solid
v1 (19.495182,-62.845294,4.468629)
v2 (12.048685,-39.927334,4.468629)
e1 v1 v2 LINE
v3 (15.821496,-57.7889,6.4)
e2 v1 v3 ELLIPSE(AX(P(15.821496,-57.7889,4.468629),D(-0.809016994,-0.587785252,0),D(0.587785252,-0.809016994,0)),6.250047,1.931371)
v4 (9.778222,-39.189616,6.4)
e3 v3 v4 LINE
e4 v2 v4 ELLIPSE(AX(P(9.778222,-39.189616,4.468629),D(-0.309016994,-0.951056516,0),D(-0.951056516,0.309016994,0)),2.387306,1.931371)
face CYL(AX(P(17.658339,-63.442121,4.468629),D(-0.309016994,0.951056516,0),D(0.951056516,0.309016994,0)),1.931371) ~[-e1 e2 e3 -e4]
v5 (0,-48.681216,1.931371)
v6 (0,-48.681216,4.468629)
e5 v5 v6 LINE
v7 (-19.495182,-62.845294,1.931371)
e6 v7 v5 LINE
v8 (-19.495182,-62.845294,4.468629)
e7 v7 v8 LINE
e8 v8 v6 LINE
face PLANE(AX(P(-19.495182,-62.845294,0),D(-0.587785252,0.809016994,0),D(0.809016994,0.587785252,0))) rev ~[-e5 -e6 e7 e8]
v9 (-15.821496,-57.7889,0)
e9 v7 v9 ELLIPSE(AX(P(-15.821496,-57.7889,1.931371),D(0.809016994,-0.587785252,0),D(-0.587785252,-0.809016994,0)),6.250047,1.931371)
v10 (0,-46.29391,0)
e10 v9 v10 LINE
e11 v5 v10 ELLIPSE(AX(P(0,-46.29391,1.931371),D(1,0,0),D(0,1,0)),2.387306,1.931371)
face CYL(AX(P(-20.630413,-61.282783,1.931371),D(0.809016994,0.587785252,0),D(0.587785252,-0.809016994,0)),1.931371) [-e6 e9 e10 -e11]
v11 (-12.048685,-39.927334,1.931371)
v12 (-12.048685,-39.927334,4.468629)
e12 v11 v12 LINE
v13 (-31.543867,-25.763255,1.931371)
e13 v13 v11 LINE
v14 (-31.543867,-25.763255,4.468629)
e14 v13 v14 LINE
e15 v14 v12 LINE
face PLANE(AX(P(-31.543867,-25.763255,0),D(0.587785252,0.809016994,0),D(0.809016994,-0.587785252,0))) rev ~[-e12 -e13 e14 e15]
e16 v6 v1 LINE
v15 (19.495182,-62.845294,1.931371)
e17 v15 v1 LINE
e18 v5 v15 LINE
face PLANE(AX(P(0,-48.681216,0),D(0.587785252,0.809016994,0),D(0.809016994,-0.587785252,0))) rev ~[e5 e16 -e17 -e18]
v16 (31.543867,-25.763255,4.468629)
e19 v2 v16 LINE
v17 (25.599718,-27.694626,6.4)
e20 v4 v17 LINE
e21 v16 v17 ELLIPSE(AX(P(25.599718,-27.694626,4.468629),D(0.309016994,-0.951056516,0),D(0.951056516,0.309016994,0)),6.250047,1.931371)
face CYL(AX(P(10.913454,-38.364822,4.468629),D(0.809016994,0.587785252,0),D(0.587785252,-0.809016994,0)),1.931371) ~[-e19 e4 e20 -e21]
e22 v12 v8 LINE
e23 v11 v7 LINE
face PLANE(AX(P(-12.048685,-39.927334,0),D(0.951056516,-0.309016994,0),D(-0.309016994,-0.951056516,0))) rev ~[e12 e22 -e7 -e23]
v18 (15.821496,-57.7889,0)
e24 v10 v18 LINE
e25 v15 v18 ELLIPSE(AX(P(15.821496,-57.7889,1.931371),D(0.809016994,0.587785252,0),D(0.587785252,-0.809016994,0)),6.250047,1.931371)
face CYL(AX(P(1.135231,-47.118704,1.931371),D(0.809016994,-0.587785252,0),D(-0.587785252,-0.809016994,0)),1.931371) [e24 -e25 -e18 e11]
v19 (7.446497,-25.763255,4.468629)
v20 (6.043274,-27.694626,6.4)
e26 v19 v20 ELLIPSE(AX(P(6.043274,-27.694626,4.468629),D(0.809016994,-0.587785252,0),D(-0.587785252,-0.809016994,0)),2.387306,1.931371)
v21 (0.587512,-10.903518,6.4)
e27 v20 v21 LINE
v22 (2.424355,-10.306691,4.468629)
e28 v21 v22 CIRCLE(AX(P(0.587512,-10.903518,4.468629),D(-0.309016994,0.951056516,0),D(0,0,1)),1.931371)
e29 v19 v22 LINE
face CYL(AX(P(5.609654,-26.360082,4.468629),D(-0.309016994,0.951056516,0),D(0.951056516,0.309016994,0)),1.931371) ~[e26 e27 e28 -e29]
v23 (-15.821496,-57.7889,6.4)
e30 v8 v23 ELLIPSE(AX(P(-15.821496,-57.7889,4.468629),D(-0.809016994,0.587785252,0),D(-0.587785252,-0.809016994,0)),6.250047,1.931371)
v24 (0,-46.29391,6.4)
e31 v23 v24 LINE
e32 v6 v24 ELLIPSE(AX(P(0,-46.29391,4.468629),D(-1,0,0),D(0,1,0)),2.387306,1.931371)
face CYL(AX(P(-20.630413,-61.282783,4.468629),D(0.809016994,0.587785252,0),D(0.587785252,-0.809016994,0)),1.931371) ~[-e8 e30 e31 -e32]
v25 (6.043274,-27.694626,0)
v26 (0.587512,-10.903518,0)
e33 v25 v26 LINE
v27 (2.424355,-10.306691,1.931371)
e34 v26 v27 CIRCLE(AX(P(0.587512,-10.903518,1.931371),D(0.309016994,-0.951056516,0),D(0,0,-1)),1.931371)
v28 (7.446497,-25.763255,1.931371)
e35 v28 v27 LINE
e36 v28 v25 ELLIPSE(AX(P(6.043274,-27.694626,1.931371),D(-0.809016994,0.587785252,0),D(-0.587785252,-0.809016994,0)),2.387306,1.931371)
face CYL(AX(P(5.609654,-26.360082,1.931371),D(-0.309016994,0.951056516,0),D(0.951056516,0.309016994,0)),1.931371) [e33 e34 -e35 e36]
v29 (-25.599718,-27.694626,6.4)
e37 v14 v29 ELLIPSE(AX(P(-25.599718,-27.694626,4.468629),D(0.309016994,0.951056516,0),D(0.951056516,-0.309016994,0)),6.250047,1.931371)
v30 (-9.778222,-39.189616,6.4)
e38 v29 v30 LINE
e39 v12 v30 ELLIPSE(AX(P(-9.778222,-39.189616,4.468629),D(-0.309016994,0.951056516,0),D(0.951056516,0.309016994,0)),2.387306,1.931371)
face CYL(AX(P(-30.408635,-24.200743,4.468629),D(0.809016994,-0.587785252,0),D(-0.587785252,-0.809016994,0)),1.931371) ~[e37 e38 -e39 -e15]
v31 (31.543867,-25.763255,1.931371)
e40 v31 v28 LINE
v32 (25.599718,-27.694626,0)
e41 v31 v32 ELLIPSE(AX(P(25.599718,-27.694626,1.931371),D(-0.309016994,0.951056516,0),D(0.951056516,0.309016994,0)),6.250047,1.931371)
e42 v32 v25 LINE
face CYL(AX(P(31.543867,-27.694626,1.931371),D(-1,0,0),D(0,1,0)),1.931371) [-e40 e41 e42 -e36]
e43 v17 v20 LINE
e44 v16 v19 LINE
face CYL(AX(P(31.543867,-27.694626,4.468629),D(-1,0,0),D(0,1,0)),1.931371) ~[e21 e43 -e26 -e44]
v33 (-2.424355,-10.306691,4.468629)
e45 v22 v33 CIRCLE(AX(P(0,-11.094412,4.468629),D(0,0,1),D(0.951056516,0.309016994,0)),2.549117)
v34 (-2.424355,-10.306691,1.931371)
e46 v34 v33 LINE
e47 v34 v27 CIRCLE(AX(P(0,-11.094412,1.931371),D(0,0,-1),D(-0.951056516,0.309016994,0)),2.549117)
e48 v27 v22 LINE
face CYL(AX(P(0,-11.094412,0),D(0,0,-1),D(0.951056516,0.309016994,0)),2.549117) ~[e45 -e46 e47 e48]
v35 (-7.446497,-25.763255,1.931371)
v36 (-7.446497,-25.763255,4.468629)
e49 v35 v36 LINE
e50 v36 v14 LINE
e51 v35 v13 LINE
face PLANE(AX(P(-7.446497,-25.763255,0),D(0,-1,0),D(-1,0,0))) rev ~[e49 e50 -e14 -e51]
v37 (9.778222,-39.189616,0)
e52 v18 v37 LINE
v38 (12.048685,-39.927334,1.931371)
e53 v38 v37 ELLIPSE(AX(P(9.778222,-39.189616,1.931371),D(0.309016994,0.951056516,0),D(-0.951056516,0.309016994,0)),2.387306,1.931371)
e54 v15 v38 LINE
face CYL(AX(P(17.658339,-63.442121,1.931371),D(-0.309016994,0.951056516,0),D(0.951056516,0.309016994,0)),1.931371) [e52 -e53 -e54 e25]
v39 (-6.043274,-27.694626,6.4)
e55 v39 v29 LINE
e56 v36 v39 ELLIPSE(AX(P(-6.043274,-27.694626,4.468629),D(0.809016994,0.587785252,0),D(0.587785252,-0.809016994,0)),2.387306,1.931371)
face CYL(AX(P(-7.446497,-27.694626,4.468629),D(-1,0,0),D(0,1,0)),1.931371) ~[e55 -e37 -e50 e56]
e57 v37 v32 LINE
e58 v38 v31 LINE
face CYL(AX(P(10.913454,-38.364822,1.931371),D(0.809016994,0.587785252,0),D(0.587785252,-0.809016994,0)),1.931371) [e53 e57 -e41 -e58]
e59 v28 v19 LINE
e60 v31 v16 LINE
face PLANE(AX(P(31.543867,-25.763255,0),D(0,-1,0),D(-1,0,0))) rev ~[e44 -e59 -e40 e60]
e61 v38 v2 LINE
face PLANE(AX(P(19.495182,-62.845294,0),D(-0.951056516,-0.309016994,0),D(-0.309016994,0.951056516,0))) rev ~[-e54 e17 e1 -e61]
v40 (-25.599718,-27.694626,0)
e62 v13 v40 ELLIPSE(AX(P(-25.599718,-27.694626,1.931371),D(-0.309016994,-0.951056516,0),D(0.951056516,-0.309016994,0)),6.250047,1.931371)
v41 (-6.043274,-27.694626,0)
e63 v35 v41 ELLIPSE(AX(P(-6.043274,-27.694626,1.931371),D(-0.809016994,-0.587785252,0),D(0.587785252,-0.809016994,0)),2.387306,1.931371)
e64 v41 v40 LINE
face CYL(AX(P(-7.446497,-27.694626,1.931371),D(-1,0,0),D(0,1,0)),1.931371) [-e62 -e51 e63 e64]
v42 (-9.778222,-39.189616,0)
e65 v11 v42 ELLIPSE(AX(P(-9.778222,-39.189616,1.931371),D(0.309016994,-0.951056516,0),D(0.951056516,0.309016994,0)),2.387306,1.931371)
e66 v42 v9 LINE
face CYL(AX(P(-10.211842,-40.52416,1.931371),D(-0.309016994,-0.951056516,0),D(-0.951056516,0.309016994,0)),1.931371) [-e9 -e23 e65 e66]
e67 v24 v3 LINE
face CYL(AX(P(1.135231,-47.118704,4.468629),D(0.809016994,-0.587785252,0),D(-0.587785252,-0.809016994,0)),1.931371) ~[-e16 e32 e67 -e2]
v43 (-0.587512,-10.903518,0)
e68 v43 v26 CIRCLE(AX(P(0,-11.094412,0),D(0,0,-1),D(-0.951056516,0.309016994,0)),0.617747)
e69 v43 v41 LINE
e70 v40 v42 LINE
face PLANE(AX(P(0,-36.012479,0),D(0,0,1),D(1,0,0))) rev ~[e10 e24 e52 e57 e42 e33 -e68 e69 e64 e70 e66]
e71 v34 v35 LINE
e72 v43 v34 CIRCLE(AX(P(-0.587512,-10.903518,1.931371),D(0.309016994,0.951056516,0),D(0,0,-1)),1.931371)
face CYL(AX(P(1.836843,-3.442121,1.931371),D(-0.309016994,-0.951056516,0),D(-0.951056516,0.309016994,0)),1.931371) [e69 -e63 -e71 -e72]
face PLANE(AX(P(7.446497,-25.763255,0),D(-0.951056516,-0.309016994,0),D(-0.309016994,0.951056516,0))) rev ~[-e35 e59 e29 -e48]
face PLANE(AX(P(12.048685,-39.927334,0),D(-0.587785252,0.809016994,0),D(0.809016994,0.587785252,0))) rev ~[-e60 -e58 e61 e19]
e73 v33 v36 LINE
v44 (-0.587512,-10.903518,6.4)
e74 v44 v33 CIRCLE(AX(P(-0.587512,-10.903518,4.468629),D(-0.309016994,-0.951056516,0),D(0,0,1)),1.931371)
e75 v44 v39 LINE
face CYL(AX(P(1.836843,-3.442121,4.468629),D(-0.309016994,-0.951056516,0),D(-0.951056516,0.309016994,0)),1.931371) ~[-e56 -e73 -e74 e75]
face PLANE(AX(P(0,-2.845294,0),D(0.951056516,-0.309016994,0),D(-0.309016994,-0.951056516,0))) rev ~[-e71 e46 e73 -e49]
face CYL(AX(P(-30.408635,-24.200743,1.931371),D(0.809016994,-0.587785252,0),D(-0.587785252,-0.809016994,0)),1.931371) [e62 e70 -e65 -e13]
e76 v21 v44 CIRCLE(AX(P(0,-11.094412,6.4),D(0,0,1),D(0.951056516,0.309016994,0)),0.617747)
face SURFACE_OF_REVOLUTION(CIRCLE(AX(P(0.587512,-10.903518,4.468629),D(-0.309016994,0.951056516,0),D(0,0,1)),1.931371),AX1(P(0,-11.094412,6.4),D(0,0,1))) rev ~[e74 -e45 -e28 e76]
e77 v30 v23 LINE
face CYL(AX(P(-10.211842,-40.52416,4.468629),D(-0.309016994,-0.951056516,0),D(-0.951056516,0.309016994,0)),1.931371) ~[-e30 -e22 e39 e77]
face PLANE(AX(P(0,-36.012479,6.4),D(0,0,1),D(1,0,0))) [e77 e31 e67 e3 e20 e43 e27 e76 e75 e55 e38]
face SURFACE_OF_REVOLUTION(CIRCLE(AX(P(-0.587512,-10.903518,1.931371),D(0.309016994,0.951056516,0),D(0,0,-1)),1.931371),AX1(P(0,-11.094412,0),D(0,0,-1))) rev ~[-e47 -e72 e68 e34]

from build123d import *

# Parameters (mm, degrees)
F1_DEPTH    = 6.4
F5_R        = 1.9313708499
F6_T1_DEPTH = 6.4
F6_T4_ANGLE = 144
F6_T6_ANGLE = 144


# Not quite as in the source:
# - a fillet or chamfer that OpenCascade refuses, or shapes differently, is made with other operations: its cross-section is extruded or revolved along the edge and cut away or added


with BuildPart() as f1:
    # F0 (on Top) → F1 (new body)
    with BuildSketch(Plane.XY):
        Polygon((-31.5438667271, -25.7632551613), (-12.0486849532, -39.9273338113), (-19.495181774, -62.8452944863), (0, -48.6812158363), (19.495181774, -62.8452944863), (12.0486849532, -39.9273338113), (31.5438667271, -25.7632551613), (7.4464968208, -25.7632551613), (0, -2.8452944863), (-7.4464968208, -25.7632551613), align=None)
    extrude(amount=F1_DEPTH)

    # F5
    f5_edges = [f1.edges().sort_by_distance(p)[0] for p in [
        (-21.796276, -32.845294, 6.4),
        (-15.771933, -51.386314, 6.4),
        (-9.747591, -55.763255, 6.4),
        (9.747591, -55.763255, 6.4),
        (15.771933, -51.386314, 6.4),
        (21.796276, -32.845294, 6.4),
        (19.495182, -25.763255, 6.4),
        (3.723248, -14.304275, 6.4),
        (-3.723248, -14.304275, 6.4),
        (-19.495182, -25.763255, 6.4),
        (-21.796276, -32.845294, 0),
        (-15.771933, -51.386314, 0),
        (-9.747591, -55.763255, 0),
        (9.747591, -55.763255, 0),
        (15.771933, -51.386314, 0),
        (21.796276, -32.845294, 0),
        (19.495182, -25.763255, 0),
        (3.723248, -14.304275, 0),
        (-3.723248, -14.304275, 0),
        (-19.495182, -25.763255, 0),
    ]]
    fillet(f5_edges, radius=F5_R)

    # F6: fillet of radius 2.5491174943 on 1 edges, made by hand

    # F6_s2 → F6_t1 (cut)
    with BuildSketch(Plane.XY):
        with BuildLine():
            ThreePointArc((2.4243548038, -10.3066913542), (0, -8.5452944863), (-2.4243548038, -10.3066913542))
            Line((-2.4243548038, -10.3066913542), (0, -2.8452944863))
            Line((0, -2.8452944863), (2.4243548038, -10.3066913542))
        make_face()
    extrude(amount=F6_T1_DEPTH, mode=Mode.SUBTRACT)

    # F6_s3 → F6_t4 (revolve, cut)
    with BuildSketch(Plane(origin=(-3.2605658725, -10.0349899078, 0), x_dir=(0, 0, 1), z_dir=(-0.3090169944, -0.9510565163, 0))):
        with BuildLine():
            ThreePointArc((0, -2.8106152002), (0.5656854249, -1.4449297752), (1.9313708499, -0.8792443503))
            Line((1.9313708499, -0.8792443503), (0, -0.8792443503))
            Line((0, -0.8792443503), (0, -2.8106152002))
        make_face()
    revolve(axis=Axis((0, -11.0944119806, 0), (0, 0, -1)), revolution_arc=F6_T4_ANGLE, mode=Mode.SUBTRACT)

    # F6_s5 → F6_t6 (revolve, cut)
    with BuildSketch(Plane(origin=(3.2605658725, -10.0349899078, 0), x_dir=(0, 0, 1), z_dir=(0.3090169944, -0.9510565163, 0))):
        with BuildLine():
            ThreePointArc((6.4, 2.8106152002), (5.8343145751, 1.4449297752), (4.4686291501, 0.8792443503))
            Line((4.4686291501, 0.8792443503), (6.4, 0.8792443503))
            Line((6.4, 0.8792443503), (6.4, 2.8106152002))
        make_face()
    revolve(axis=Axis((0, -11.0944119806, 6.4), (0, 0, 1)), revolution_arc=F6_T6_ANGLE, mode=Mode.SUBTRACT)


solid = f1.part
